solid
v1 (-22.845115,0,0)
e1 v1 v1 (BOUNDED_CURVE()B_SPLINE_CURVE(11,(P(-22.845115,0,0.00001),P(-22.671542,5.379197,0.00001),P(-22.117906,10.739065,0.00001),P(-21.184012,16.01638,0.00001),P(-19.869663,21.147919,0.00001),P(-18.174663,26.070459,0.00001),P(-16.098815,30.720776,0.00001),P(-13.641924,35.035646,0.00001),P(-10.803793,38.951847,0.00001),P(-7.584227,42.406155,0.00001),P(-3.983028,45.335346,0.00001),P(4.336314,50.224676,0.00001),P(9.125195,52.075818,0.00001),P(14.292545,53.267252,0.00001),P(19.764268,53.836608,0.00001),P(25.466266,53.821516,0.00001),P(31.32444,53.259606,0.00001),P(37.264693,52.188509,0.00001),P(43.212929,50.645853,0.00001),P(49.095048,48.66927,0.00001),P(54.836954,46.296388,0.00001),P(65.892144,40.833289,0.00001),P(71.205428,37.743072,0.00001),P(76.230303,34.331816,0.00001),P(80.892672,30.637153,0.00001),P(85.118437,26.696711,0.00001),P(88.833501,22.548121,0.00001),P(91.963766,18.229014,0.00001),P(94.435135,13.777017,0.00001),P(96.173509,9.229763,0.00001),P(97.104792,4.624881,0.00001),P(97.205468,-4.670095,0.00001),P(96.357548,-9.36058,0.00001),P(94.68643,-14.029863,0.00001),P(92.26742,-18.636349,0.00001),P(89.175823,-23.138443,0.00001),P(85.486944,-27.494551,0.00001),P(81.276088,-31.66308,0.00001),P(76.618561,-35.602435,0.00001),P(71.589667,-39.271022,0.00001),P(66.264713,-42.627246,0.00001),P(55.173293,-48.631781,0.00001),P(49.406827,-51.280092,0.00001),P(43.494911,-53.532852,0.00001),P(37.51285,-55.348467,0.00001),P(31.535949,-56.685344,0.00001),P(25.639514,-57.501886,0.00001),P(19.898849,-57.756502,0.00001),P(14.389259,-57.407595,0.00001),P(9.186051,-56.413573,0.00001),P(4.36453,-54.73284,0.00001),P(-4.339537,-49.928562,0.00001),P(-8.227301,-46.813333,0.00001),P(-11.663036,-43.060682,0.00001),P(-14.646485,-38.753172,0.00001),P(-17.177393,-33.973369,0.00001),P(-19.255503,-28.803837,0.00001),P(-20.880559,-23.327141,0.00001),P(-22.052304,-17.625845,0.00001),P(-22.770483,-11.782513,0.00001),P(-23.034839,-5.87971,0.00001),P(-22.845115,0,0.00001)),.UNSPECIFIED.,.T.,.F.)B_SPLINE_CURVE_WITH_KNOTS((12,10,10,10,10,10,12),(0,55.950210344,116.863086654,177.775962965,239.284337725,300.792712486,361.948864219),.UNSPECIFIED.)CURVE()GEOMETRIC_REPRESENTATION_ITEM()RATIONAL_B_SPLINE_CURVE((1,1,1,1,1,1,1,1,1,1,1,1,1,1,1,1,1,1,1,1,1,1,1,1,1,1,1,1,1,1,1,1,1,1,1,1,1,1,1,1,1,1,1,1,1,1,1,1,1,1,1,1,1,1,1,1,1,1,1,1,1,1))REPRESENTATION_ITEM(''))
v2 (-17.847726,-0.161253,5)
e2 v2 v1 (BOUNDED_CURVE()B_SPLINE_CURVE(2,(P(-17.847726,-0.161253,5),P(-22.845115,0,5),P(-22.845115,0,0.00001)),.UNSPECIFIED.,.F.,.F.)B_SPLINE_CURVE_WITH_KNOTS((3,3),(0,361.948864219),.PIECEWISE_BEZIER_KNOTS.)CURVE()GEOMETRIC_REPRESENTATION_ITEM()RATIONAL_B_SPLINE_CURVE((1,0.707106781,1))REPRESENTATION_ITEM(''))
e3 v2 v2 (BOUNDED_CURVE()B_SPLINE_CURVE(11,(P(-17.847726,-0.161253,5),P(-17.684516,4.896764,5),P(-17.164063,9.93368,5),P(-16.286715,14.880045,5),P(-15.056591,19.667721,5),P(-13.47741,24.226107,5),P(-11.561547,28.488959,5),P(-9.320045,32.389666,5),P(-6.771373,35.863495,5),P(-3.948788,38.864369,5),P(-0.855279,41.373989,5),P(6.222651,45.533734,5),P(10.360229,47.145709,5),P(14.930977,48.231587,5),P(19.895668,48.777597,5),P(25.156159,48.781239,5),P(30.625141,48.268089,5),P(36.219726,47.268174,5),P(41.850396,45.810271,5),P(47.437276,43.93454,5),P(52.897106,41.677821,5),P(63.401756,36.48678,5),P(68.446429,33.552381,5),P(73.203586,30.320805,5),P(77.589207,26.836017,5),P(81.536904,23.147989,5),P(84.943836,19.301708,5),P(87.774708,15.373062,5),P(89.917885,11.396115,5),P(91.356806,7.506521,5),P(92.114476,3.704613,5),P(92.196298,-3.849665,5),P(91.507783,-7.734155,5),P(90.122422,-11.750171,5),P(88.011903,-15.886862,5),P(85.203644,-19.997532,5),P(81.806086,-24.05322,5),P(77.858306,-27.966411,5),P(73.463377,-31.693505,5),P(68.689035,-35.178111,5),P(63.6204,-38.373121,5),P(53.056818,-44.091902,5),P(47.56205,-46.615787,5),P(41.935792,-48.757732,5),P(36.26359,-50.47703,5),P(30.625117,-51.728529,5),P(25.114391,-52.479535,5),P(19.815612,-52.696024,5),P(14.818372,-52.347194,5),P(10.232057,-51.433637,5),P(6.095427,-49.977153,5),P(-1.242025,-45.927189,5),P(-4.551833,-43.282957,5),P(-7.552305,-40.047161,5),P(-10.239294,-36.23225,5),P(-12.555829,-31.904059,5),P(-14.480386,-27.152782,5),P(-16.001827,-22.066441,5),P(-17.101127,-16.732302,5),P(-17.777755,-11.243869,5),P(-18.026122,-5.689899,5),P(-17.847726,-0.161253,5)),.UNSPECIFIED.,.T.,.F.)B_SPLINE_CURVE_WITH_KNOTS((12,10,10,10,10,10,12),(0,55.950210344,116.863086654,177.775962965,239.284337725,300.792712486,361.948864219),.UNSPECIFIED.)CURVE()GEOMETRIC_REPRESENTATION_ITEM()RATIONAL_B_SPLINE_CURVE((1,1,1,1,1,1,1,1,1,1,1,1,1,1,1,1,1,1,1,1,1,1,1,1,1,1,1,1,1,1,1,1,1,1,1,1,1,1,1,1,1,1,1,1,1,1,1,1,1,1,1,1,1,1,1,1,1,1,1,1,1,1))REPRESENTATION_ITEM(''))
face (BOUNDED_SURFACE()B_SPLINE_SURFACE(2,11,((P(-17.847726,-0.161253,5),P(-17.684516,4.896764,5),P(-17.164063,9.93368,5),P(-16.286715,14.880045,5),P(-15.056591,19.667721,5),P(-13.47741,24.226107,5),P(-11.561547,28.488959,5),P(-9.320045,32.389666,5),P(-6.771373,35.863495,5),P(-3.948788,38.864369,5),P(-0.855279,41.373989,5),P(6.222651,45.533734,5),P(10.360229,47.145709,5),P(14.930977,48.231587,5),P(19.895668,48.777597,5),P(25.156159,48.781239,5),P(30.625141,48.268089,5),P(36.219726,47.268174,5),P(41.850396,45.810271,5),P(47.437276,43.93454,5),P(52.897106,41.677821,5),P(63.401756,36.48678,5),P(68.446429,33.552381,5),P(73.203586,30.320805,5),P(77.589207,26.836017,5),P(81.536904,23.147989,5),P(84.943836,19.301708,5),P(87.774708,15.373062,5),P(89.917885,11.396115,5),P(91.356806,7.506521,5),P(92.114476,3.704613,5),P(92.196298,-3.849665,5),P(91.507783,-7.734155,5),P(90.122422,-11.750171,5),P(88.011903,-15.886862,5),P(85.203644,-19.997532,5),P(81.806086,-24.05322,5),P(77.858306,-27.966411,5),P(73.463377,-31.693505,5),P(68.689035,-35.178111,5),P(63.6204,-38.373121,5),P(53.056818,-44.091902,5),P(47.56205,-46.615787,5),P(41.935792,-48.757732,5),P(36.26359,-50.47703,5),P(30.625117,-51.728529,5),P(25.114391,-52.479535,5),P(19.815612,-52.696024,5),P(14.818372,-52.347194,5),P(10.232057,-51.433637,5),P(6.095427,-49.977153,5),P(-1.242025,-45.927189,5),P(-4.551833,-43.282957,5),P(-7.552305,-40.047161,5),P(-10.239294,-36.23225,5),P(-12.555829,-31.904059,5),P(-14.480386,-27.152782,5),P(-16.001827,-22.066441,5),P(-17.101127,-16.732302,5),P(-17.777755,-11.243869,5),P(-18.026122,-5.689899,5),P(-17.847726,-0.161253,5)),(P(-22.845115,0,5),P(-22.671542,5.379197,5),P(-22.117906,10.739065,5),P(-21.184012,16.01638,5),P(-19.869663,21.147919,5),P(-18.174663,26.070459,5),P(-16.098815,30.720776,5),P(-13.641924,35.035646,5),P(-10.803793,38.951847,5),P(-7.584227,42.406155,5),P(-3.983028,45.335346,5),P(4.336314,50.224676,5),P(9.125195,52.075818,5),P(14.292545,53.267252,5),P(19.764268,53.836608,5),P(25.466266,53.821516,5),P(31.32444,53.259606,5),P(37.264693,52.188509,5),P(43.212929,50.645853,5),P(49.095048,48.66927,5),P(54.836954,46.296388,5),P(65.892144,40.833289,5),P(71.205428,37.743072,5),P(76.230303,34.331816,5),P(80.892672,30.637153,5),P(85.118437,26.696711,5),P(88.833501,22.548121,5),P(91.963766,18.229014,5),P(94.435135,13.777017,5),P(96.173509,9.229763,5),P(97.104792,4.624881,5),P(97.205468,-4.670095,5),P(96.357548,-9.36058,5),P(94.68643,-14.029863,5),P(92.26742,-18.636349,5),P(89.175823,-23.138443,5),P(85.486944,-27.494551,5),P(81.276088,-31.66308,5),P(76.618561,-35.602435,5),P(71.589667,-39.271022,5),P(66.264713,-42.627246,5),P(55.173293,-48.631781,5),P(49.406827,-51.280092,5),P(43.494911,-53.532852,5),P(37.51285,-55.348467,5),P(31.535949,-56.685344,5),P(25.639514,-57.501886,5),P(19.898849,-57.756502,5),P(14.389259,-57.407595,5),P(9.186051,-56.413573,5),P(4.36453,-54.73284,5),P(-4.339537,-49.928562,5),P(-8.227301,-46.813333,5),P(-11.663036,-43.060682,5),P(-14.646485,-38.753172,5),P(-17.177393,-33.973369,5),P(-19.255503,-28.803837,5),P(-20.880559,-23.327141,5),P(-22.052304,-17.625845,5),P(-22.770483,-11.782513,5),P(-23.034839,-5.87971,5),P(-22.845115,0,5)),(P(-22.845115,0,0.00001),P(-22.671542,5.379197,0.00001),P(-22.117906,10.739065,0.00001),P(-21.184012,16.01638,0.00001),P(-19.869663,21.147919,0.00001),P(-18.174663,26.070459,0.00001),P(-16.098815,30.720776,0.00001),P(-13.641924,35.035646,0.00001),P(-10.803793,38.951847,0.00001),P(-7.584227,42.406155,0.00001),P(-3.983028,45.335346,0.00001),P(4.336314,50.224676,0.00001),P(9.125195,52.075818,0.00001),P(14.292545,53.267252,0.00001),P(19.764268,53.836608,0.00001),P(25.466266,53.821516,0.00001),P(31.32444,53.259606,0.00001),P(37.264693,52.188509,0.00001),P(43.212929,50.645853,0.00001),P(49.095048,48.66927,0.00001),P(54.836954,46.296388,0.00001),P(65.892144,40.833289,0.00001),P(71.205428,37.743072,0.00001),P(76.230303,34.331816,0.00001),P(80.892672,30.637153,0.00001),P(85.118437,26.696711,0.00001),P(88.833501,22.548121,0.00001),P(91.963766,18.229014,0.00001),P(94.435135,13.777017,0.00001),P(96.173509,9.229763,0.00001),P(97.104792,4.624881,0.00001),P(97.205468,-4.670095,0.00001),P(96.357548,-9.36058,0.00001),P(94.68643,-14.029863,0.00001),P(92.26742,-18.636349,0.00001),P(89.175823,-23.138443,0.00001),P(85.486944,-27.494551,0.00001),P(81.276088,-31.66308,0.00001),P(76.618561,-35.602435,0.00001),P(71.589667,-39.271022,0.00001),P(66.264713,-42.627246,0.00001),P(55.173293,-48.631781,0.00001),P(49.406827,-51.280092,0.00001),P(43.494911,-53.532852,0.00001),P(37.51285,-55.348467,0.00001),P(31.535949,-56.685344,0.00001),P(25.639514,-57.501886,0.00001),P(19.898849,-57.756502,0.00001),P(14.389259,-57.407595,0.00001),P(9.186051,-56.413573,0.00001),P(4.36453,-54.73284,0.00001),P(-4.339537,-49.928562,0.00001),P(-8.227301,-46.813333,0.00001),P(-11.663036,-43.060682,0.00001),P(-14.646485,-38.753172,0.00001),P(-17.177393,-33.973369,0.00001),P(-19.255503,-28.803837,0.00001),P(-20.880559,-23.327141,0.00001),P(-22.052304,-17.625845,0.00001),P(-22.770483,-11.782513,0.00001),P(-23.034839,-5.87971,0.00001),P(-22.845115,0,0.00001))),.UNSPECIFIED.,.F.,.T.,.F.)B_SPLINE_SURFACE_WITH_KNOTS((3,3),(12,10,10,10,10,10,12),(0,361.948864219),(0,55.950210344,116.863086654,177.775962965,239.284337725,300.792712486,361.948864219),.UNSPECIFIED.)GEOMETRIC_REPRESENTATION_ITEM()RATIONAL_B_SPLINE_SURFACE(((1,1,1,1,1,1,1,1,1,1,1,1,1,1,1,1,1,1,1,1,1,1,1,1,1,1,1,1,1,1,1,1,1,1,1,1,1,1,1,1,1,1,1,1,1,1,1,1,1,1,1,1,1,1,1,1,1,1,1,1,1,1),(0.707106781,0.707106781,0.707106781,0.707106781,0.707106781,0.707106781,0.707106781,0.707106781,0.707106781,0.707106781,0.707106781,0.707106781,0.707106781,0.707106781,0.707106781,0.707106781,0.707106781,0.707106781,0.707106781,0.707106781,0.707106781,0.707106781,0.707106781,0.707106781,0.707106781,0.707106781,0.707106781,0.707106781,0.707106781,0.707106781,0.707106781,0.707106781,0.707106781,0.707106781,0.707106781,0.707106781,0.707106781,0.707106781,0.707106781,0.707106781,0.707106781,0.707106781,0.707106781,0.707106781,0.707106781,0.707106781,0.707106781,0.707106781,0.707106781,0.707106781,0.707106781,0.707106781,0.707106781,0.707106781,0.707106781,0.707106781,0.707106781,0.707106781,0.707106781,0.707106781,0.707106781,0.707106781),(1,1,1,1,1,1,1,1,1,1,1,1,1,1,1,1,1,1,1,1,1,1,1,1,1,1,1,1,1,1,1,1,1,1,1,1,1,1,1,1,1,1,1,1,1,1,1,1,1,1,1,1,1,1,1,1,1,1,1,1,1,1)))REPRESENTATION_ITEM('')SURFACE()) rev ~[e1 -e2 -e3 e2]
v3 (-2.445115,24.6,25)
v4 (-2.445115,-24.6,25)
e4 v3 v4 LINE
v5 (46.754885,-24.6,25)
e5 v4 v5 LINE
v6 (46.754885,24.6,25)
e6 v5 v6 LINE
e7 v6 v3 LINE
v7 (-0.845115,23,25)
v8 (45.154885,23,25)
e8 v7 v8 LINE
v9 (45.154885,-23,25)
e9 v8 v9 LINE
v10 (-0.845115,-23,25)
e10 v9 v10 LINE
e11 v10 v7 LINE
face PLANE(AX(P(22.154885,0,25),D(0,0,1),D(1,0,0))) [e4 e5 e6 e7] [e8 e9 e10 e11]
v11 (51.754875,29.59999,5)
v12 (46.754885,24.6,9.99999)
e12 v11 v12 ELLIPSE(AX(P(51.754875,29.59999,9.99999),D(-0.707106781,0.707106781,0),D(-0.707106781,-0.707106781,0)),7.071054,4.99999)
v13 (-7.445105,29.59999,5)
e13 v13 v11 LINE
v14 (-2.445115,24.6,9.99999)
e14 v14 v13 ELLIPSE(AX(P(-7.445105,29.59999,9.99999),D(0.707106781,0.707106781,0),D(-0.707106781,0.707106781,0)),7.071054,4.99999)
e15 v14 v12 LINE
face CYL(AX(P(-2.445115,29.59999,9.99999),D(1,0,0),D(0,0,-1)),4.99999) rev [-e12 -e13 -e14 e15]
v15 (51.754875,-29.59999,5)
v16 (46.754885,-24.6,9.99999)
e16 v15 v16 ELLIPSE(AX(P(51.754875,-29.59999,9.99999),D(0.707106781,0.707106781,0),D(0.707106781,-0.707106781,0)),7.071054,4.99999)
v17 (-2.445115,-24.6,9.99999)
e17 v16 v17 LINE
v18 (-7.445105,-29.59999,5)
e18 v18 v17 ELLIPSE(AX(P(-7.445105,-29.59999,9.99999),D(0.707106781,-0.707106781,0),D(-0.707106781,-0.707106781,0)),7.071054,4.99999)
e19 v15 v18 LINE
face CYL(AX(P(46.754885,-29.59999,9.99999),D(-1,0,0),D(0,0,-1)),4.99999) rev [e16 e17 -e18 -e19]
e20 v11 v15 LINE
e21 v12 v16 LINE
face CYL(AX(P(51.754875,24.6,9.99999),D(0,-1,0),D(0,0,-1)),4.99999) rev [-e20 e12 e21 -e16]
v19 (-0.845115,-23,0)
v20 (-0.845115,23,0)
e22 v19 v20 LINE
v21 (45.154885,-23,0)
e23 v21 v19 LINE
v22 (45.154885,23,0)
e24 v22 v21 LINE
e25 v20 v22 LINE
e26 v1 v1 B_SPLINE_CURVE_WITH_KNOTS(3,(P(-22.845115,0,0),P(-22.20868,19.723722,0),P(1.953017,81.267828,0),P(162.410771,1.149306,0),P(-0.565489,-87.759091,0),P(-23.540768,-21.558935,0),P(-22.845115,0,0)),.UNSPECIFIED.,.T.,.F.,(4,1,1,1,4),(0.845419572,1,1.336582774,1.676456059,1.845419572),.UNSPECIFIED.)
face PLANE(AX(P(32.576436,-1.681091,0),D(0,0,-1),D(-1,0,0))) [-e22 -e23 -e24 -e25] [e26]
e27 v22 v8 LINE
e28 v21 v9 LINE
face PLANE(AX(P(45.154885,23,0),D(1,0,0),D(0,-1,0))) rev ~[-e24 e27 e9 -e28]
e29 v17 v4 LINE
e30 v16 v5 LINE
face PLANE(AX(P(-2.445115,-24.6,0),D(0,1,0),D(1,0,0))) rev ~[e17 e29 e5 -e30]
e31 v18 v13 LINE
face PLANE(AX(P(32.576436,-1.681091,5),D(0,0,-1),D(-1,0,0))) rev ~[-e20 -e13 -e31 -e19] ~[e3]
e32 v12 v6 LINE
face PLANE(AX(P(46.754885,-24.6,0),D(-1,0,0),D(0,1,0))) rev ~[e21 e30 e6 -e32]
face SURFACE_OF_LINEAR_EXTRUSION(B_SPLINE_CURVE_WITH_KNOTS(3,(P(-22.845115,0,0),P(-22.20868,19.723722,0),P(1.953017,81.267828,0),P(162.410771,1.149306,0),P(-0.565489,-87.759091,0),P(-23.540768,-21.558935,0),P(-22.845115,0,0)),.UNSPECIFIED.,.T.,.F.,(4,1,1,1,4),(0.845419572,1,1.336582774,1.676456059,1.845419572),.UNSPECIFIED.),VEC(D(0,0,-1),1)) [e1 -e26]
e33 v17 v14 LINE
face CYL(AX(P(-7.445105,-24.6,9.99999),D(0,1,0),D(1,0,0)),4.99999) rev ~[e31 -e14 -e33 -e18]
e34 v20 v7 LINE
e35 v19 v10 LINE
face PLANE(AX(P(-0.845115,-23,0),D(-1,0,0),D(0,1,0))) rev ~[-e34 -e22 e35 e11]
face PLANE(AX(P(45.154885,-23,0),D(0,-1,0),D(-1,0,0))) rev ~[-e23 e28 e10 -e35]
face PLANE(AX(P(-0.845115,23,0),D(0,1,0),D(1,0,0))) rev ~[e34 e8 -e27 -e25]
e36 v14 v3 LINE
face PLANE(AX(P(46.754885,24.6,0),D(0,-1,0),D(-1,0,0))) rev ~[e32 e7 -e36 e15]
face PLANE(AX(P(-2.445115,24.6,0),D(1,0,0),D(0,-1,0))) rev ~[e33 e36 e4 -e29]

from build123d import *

# Parameters (mm, degrees)
F1_DEPTH = 5
F2_DEPTH = 25
F3_R     = 4.99999


# Not quite as in the source:
# - a fillet or chamfer is up to 0.001 mm smaller than in the source, because OpenCascade refuses the exact size


with BuildPart() as f1:
    # F0 (on Top) → F1 (new body)
    with BuildSketch(Plane.XY):
        with BuildLine():
            add(Edge.make_bspline(
                [(0, 47.6761966849), (31.7996343084, 66.3650460849), (162.4107710873, 1.1493064278), (-0.5654891103, -87.7590913423), (-23.5407682827, -21.5589349291), (-22.8451150266, 0)],
                knots=[0, 0, 0, 0, 0.3365827736, 0.6764560587, 0.845419572, 0.845419572, 0.845419572, 0.845419572], degree=3))
            add(Edge.make_bspline(
                [(-22.8451150266, 0), (-22.2086795266, 19.7237221407), (-14.6044345316, 39.0930766752), (0, 47.6761966849)],
                knots=[0.845419572, 0.845419572, 0.845419572, 0.845419572, 1, 1, 1, 1], degree=3))
        make_face()
        Polygon((-2.4451150266, -24.6), (-2.4451150266, 0), (-2.4451150266, 24.6), (46.7548849734, 24.6), (46.7548849734, -24.6), align=None, mode=Mode.SUBTRACT)
    extrude(amount=F1_DEPTH)

    # F0 (on Top) → F2 (join)
    with BuildSketch(Plane.XY):
        Polygon((-2.4451150266, 24.6), (-2.4451150266, 0), (-2.4451150266, -24.6), (46.7548849734, -24.6), (46.7548849734, 24.6), align=None)
        Polygon((-0.8451150266, -23), (-0.8451150266, 0), (-0.8451150266, 23), (45.1548849734, 23), (45.1548849734, -23), align=None, mode=Mode.SUBTRACT)
    extrude(amount=F2_DEPTH)

    # F3 (radius 5 in the source; OpenCascade refuses exactly that, so slightly less here)
    f3_edges = [f1.edges().sort_by_distance(p)[0] for p in [
        (46.754885, 0, 5),
        (22.154885, -24.6, 5),
        (-2.445115, 0, 5),
        (22.154885, 24.6, 5),
        (84.577965, -27.452992, 5),
    ]]
    fillet(f3_edges, radius=F3_R)


solid = f1.part
